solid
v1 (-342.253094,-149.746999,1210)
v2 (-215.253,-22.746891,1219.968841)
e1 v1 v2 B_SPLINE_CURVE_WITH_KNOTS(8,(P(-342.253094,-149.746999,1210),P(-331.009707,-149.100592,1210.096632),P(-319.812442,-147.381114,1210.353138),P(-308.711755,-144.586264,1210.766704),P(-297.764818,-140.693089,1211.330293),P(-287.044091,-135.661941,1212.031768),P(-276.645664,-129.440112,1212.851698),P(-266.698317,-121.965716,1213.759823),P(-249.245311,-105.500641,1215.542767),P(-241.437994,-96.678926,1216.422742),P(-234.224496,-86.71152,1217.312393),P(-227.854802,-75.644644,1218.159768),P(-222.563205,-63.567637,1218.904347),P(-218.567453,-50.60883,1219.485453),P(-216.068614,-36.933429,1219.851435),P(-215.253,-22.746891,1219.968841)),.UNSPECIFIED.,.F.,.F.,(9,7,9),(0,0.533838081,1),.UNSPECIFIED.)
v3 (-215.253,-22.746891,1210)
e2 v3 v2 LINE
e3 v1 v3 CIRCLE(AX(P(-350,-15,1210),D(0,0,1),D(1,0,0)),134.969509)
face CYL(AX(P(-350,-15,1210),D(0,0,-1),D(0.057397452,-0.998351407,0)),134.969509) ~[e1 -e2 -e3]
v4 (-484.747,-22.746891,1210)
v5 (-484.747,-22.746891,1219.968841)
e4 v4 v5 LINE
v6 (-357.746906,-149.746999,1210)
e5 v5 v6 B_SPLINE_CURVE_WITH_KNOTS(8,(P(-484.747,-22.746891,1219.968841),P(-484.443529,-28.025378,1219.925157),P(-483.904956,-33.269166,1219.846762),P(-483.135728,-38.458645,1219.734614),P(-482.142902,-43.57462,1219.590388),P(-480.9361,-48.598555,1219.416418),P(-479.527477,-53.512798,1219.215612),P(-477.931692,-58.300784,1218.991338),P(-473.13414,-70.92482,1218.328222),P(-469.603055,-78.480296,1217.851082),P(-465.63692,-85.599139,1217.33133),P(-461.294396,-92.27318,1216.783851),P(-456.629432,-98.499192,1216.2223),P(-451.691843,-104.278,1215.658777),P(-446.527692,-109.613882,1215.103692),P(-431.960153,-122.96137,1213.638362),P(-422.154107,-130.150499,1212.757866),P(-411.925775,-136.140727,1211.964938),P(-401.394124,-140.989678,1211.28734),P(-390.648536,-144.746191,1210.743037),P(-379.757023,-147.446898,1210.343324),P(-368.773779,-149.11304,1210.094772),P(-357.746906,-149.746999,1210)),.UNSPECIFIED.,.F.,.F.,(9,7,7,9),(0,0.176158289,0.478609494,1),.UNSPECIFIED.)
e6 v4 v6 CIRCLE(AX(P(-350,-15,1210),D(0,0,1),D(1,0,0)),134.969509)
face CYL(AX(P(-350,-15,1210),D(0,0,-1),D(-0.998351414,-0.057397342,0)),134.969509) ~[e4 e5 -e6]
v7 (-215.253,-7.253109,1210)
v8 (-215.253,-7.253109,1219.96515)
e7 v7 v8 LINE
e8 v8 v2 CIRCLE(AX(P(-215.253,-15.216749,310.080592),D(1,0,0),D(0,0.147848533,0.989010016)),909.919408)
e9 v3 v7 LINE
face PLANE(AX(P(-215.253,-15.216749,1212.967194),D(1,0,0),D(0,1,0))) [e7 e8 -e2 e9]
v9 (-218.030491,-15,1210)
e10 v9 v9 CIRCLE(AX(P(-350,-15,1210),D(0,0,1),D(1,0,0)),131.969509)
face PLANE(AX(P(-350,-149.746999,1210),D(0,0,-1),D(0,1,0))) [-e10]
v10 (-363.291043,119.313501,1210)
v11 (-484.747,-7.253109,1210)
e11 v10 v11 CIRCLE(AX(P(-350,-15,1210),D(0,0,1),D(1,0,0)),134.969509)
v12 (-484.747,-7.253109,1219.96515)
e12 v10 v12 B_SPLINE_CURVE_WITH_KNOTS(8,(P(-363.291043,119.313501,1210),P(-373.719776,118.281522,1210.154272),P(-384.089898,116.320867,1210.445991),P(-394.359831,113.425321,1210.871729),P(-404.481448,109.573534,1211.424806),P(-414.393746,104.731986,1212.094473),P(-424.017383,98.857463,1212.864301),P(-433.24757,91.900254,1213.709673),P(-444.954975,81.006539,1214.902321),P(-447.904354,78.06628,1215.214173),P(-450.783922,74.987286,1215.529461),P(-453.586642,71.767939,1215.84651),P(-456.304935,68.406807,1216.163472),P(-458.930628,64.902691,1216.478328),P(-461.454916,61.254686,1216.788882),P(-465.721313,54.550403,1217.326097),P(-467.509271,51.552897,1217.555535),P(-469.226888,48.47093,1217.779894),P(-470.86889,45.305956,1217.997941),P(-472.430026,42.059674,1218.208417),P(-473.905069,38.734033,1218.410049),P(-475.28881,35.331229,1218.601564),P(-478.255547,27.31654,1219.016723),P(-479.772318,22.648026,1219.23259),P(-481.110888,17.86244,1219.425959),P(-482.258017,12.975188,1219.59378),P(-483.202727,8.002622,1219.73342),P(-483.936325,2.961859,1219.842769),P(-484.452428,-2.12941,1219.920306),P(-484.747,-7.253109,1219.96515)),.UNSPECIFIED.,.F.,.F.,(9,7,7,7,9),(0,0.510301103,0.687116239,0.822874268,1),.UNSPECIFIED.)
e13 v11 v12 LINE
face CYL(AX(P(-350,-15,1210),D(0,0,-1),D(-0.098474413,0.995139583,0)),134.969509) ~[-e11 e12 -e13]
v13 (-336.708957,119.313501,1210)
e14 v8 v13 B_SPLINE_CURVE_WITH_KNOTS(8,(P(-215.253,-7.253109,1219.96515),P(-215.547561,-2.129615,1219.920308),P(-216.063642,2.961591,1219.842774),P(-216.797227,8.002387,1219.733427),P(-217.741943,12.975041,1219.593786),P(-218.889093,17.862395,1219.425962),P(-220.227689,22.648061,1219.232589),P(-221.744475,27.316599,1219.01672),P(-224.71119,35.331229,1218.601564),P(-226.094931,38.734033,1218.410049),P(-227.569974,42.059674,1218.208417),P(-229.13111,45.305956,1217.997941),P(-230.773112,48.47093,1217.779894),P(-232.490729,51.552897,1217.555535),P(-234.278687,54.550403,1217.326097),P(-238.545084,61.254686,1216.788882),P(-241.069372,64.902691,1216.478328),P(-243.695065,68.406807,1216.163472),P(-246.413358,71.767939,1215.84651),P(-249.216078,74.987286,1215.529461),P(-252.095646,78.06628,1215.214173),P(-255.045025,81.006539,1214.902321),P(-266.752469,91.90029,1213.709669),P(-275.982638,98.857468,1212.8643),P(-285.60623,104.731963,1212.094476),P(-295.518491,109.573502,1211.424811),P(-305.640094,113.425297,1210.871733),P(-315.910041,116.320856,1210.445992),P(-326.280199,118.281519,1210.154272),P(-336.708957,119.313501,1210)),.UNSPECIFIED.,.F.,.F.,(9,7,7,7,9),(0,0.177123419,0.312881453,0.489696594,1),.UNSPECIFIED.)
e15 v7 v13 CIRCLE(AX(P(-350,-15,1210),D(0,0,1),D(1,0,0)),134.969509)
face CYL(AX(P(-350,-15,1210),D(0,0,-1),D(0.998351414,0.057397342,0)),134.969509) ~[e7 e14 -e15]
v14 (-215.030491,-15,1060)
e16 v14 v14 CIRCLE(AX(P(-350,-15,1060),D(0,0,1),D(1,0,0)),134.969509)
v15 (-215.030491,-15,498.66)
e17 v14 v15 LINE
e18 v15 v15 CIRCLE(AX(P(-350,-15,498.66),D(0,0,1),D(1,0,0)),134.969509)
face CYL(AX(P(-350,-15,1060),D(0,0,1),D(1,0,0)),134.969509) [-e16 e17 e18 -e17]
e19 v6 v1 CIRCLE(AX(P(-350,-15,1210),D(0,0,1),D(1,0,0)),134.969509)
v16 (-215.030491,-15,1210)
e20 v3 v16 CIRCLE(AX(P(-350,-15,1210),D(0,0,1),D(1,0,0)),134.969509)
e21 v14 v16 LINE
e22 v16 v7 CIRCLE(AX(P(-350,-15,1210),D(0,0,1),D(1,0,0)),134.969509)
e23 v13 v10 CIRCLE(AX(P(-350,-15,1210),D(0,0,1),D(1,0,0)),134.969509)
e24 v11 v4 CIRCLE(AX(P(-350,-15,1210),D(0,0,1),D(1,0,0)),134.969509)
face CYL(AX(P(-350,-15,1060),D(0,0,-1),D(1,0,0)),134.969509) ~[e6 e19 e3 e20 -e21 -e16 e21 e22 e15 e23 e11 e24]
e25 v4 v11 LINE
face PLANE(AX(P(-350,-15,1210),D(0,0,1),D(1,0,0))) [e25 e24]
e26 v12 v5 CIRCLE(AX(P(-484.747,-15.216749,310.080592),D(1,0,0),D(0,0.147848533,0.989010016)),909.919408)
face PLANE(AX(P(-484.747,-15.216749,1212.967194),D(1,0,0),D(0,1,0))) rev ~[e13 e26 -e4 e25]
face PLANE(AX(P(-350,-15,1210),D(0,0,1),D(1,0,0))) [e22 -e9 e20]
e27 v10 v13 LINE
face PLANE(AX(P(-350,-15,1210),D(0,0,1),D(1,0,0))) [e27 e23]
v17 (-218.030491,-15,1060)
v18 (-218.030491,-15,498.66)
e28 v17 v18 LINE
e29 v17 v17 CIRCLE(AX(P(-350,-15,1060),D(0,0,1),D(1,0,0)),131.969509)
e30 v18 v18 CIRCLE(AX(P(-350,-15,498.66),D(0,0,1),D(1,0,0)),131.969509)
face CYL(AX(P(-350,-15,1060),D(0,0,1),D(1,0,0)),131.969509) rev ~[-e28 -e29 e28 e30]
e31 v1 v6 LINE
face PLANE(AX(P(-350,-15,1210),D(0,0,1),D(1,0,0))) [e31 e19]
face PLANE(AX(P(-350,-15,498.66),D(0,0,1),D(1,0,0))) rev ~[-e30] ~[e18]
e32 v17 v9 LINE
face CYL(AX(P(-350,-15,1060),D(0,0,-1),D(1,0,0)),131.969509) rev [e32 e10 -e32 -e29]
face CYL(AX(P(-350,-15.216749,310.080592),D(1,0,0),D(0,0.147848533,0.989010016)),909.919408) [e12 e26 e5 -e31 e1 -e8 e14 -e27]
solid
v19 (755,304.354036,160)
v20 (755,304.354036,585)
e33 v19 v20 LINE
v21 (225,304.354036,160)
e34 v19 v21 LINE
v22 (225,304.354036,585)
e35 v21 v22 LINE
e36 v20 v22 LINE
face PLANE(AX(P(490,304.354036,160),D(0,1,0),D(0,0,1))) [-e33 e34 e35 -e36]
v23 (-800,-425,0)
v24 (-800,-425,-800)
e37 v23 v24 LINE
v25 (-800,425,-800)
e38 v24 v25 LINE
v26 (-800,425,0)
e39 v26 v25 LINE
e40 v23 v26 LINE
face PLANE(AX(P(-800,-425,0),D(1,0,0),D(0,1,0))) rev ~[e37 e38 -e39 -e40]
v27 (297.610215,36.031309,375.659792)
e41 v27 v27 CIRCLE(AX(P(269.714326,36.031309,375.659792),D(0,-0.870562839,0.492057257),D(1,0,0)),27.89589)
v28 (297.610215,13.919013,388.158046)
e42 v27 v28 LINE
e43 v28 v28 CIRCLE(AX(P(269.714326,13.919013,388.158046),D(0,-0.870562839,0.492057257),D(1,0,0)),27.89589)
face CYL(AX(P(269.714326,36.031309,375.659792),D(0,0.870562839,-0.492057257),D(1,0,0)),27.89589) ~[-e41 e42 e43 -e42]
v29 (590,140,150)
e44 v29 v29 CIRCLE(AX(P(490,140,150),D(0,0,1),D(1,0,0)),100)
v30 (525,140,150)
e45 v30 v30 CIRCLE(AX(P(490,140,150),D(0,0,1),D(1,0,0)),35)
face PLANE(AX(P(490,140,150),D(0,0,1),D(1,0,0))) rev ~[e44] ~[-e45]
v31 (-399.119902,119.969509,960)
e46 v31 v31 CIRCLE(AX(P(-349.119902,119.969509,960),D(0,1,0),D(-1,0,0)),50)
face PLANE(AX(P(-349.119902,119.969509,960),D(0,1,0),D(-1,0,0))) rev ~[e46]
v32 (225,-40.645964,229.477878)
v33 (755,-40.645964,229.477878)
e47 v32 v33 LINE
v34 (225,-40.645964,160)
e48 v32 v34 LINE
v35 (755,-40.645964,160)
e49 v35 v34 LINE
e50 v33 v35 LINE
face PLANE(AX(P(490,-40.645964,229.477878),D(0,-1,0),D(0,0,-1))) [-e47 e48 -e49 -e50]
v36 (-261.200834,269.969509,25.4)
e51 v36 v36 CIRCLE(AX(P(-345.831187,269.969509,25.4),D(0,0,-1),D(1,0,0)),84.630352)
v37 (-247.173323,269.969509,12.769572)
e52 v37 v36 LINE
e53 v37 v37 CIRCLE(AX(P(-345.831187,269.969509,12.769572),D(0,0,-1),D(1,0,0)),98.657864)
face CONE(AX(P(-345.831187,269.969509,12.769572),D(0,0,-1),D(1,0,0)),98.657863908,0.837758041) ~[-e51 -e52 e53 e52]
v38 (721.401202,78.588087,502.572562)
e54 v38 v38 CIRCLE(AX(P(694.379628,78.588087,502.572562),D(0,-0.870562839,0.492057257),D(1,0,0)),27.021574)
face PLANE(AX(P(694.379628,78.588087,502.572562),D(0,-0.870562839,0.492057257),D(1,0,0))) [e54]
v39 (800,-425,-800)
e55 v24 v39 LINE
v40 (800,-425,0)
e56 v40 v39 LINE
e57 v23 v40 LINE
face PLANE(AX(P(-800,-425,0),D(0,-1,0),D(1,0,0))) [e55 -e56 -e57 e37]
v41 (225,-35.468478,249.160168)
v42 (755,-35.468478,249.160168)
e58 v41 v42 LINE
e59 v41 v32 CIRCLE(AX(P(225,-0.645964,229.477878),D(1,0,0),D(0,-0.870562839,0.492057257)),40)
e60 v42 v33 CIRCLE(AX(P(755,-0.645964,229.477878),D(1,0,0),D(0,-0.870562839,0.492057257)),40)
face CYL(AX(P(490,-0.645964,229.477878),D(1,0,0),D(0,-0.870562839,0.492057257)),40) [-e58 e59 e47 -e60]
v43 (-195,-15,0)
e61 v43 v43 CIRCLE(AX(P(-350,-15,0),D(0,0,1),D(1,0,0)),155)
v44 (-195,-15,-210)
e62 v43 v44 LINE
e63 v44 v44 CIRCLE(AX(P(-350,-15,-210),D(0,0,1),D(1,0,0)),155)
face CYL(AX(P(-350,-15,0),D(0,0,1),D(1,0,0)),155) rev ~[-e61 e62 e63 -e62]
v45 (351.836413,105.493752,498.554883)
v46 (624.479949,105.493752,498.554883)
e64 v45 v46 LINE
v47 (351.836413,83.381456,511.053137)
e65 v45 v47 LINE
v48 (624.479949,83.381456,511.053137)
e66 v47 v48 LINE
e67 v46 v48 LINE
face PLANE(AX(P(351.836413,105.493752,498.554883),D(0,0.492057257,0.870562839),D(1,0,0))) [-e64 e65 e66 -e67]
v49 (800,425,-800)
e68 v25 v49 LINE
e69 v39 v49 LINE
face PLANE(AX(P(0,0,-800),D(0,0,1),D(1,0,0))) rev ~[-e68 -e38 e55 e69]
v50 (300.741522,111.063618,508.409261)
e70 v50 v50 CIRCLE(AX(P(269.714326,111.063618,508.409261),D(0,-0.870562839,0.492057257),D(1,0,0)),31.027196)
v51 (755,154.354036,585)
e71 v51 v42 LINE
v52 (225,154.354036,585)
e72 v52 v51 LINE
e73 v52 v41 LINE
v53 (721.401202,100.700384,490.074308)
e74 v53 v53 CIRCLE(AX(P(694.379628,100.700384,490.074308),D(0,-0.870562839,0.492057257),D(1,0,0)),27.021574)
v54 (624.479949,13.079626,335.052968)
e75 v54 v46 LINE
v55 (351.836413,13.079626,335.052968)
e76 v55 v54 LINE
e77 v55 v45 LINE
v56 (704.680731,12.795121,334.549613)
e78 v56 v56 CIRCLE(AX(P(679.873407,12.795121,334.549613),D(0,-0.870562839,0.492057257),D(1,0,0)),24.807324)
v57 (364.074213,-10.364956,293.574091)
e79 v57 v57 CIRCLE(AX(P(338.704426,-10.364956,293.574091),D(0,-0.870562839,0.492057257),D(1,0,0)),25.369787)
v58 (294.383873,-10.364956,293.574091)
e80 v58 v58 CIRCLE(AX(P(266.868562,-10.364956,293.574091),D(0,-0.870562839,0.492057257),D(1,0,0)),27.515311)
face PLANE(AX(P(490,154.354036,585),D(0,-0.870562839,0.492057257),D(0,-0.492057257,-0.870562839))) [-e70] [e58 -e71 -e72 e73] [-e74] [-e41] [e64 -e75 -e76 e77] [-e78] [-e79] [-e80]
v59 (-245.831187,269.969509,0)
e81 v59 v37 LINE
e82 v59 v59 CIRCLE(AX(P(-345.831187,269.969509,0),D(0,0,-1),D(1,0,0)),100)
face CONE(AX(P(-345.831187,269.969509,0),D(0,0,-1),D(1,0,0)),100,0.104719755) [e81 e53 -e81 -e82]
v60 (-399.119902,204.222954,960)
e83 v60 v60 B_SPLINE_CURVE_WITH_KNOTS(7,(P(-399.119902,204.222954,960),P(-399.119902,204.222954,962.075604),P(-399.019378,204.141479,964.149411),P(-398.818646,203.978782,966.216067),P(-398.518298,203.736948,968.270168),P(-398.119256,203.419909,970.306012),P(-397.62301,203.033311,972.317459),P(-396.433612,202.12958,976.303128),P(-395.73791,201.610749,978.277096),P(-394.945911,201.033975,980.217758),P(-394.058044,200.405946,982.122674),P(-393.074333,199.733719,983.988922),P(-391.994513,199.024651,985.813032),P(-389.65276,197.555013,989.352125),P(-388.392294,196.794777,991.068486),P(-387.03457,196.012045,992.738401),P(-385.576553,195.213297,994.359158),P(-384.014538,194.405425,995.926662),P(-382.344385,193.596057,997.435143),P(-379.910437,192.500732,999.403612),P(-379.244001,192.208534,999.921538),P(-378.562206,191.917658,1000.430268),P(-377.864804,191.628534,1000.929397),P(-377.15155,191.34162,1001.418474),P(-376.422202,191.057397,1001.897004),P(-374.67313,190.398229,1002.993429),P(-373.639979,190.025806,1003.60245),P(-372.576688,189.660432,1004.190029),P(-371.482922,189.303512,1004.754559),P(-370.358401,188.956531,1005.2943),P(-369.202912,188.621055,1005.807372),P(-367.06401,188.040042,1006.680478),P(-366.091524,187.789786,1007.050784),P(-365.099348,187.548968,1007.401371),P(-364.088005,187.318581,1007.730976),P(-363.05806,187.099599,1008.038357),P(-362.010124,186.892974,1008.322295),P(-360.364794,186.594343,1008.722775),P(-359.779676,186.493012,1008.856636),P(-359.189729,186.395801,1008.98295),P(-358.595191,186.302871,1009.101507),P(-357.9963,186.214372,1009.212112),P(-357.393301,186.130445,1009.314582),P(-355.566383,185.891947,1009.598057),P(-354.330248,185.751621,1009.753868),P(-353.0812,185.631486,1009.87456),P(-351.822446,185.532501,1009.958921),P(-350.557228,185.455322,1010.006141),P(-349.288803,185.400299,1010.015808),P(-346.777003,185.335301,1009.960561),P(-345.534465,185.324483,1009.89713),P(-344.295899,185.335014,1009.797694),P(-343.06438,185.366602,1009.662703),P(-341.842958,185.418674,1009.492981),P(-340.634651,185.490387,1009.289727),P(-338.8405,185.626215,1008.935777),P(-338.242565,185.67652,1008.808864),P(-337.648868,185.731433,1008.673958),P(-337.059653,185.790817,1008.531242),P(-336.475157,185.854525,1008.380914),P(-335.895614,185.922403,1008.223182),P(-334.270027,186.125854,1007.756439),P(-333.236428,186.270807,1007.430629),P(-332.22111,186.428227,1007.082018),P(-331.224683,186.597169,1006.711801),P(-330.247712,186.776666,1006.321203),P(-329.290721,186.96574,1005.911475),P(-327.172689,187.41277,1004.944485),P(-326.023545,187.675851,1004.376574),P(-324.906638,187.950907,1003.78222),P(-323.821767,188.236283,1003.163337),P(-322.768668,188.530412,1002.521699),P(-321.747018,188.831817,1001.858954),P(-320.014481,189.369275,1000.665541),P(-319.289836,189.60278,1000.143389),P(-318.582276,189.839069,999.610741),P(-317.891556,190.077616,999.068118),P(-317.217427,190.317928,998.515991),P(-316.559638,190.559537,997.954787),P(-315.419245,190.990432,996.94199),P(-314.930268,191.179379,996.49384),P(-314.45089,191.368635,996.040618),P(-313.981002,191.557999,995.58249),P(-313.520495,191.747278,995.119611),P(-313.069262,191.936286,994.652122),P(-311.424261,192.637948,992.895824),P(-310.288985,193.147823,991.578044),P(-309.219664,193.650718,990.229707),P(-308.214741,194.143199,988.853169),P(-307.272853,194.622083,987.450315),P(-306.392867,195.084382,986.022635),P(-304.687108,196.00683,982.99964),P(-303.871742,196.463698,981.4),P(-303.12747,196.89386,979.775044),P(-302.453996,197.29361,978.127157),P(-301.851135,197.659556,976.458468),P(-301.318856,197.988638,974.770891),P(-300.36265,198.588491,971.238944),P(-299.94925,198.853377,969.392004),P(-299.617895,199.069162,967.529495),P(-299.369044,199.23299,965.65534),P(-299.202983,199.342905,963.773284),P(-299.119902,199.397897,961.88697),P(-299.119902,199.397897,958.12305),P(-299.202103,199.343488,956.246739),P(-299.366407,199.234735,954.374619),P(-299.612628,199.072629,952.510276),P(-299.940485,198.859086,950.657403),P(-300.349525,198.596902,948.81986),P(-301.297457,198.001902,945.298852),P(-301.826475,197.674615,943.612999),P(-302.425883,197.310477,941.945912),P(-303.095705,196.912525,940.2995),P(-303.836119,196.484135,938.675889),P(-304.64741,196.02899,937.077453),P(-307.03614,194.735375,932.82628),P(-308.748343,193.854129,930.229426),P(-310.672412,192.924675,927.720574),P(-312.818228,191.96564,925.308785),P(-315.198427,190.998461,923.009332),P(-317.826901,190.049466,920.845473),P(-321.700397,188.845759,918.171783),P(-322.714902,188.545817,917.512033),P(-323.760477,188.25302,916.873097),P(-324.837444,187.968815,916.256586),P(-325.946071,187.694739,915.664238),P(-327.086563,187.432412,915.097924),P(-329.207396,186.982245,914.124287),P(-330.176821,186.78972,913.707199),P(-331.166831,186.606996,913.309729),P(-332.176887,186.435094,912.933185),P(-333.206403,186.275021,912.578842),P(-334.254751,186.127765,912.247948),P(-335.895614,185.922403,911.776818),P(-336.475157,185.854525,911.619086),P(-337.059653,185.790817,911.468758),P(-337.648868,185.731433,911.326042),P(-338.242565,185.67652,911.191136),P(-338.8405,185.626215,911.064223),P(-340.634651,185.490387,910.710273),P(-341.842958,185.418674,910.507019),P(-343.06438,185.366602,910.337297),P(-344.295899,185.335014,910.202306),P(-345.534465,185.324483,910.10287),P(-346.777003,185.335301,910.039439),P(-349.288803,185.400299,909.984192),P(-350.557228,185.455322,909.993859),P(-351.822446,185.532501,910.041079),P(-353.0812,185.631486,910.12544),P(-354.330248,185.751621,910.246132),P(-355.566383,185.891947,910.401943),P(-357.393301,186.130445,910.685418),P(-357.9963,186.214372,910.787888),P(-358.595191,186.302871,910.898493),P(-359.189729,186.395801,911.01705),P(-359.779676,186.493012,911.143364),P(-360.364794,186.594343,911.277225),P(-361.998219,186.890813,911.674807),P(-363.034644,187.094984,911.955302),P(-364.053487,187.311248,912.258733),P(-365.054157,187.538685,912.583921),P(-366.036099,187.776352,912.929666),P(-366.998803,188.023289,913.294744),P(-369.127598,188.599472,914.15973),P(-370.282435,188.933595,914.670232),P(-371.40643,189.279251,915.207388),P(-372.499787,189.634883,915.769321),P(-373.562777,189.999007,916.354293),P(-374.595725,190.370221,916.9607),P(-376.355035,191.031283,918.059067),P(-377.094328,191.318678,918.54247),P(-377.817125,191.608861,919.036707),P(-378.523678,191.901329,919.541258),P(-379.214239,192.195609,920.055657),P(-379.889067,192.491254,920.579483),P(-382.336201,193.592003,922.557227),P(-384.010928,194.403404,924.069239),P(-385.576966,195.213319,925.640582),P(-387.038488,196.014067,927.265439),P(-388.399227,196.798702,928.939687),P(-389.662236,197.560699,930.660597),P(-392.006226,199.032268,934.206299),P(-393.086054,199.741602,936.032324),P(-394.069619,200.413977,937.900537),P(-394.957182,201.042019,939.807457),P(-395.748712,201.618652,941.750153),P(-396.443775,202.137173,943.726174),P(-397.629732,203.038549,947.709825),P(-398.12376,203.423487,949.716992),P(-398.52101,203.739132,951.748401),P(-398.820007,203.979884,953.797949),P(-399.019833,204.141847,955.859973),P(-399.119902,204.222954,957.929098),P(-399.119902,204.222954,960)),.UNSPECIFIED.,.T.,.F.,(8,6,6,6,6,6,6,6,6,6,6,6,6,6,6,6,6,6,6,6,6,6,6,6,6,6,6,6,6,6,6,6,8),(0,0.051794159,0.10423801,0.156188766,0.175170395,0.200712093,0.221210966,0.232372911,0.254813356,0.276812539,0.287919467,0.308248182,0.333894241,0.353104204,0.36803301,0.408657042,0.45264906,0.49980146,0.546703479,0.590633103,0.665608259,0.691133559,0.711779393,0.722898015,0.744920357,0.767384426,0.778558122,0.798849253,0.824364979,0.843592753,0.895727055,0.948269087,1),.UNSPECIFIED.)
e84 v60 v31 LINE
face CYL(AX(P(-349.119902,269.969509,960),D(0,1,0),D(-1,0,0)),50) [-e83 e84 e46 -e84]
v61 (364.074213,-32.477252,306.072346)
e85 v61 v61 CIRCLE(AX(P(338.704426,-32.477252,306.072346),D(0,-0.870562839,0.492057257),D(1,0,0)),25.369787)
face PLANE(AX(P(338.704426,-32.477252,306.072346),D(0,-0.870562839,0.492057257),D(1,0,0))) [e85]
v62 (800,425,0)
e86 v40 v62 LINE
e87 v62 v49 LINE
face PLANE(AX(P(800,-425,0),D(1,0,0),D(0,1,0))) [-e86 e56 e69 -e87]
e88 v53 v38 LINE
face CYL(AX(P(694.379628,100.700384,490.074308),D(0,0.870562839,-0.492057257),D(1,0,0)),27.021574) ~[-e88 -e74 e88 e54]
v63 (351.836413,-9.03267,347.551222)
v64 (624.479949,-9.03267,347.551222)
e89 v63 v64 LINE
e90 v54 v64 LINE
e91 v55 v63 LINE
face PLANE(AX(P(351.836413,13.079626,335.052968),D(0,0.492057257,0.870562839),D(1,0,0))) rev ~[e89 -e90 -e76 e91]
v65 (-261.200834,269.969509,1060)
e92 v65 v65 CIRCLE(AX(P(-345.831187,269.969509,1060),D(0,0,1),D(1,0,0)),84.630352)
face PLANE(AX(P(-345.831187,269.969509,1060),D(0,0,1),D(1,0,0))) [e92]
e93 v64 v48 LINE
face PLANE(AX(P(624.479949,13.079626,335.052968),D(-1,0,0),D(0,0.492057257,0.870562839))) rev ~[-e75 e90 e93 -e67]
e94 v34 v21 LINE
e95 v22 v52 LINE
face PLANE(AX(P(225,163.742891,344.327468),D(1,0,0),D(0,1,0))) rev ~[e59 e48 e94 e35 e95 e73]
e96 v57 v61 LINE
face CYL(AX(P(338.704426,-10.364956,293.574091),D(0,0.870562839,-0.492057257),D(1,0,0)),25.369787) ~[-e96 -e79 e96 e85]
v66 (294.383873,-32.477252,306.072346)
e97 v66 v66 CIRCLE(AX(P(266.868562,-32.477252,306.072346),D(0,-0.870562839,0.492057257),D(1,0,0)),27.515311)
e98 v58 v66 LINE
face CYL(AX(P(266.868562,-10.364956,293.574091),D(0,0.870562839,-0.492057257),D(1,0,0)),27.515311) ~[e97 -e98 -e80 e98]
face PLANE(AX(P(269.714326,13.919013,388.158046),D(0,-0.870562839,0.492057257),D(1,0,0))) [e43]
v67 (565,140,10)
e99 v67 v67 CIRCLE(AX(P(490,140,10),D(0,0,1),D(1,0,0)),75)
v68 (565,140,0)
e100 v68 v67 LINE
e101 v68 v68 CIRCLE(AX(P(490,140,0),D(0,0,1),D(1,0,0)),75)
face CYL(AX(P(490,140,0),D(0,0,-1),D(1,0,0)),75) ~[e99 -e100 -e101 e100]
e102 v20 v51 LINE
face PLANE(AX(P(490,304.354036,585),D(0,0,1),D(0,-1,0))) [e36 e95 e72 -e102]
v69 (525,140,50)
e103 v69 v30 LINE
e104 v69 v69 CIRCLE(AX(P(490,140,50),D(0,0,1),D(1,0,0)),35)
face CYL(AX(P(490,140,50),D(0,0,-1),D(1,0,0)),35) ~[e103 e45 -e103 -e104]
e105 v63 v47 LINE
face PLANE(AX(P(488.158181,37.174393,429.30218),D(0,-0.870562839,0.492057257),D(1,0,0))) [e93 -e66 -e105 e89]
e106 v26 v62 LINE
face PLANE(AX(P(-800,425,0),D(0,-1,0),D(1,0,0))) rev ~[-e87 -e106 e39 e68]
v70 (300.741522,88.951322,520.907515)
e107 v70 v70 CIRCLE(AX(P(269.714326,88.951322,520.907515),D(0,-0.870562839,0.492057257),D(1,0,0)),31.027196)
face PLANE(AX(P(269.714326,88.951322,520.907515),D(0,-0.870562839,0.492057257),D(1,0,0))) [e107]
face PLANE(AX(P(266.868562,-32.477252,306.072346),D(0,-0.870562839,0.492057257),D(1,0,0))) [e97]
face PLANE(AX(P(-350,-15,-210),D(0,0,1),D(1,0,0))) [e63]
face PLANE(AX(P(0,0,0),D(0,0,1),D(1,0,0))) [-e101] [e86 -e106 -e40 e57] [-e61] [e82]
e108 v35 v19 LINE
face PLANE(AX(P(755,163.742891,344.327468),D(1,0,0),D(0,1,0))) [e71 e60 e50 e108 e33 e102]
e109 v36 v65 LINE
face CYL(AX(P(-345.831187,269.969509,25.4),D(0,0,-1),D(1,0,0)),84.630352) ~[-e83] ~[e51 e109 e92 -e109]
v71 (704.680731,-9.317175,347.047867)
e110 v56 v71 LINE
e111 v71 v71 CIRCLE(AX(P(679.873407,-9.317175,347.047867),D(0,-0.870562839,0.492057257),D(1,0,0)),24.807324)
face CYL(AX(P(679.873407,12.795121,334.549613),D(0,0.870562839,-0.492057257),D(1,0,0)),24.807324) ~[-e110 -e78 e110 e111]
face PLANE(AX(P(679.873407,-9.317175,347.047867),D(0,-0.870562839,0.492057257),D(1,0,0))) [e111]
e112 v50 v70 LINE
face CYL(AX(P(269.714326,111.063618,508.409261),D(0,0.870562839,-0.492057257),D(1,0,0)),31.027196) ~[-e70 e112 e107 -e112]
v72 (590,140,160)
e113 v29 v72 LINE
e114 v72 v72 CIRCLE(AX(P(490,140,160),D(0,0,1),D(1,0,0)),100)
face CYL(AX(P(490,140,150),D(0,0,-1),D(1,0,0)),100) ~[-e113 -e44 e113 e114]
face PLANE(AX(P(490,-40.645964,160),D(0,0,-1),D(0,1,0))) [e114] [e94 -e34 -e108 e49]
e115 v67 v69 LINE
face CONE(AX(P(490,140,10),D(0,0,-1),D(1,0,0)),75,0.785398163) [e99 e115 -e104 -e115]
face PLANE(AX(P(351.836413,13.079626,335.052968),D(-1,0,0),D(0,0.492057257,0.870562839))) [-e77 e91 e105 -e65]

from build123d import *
from build123d import SkipClean  # not in build123d's __all__

# Parameters (mm, degrees)
F0_W      = 1600
F0_H      = 850
F1_DEPTH  = 800
F2_R      = 155
F3_DEPTH  = 210
F4_R      = 100
F5_DEPTH  = 25.4
F5_TAPER  = 6
F7_R      = 84.6303524243
F8_DEPTH  = 1034.6
F9_R      = 75
F10_DEPTH = 50
F11_SIZE  = 40
F12_R     = 35
F13_DEPTH = 100
F14_R     = 100
F15_DEPTH = 10
F18_DEPTH = 265
F20_R     = 50
F21_DEPTH = 150
F22_R     = 134.9695088885
F22_R_2   = 131.9695088885
F23_DEPTH = 561.34
F24_R     = 134.9695088885
F24_R_2   = 131.9695088885
F25_DEPTH = 150
F28_DEPTH = 134.747
F30_DEPTH = 25.4
F32_DEPTH = 25.4
F34_DEPTH = 25.4
F36_DEPTH = 25.4
F37_R     = 31.0271964064
F37_R_2   = 27.8958895213
F37_R_3   = 27.5153110401
F37_R_4   = 25.3697871684
F37_R_5   = 27.0215738096
F37_R_6   = 24.8073241301
F37_W     = 272.6435363293
F37_H     = 187.8117322922
F38_DEPTH = 25.4


# Not quite as in the source:
# - a fillet or chamfer that OpenCascade refuses, or shapes differently, is made with other operations: its cross-section is extruded or revolved along the edge and cut away or added


with BuildPart() as f1:
    # F0 (on Top) → F1 (new body)
    with BuildSketch(Plane.XY):
        Rectangle(F0_W, F0_H)
    extrude(amount=-F1_DEPTH)

    # F2 (on face) → F3 (cut)
    with BuildSketch(Plane.XY):
        with Locations((-350, -15)):
            Circle(F2_R)
    extrude(amount=-F3_DEPTH, mode=Mode.SUBTRACT)

    # F4 (on face) → F5 (join)
    with BuildSketch(Plane.XY):
        with Locations((-345.8311867569, 269.9695088885)):
            Circle(F4_R)
    extrude(amount=F5_DEPTH, taper=F5_TAPER)

    # F6: chamfer of 12.7 on 1 edges, made by hand

    # F6_s1 → F6_t2 (revolve, cut)
    with BuildSketch(Plane.XZ.offset(-269.9695088885)):
        Polygon((-247.1733228492, 12.7695719288), (-261.2008343327, 25.4), (-248.5008343327, 25.4), align=None)
    revolve(axis=Axis((-345.8311867569, 269.9695088885, 25.4), (0, 0, -1)), mode=Mode.SUBTRACT)

    # F7 (on face) → F8 (join)
    with BuildSketch(Plane.XY.offset(25.4)):
        with Locations((-345.8311867569, 269.9695088885)):
            Circle(F7_R)
    extrude(amount=F8_DEPTH)

    # F9 (on face) → F10 (join)
    with BuildSketch(Plane.XY):
        with Locations((490, 140)):
            Circle(F9_R)
    extrude(amount=F10_DEPTH)

    # F11
    f11_edges = [f1.edges().sort_by_distance(p)[0] for p in [
        (415, 140, 50),
    ]]
    chamfer(f11_edges, length=F11_SIZE)

    # F12 (on face) → F13 (join)
    with BuildSketch(Plane.XY.offset(50)):
        with Locations((490, 140)):
            Circle(F12_R)
    extrude(amount=F13_DEPTH)

    # F14 (on face) → F15 (join)
    with BuildSketch(Plane.XY.offset(150)):
        with Locations((490, 140)):
            Circle(F14_R)
    extrude(amount=F15_DEPTH)

    # F17 (on face) → F18 (join, symmetric)
    with BuildSketch(Plane.YZ.offset(490)):
        with BuildLine():
            Line((304.3540355563, 585), (154.3540355563, 585))
            Line((154.3540355563, 585), (-35.4684779925, 249.1601683367))
            ThreePointArc((-35.4684779925, 249.1601683367), (-39.3299439569, 239.6538167994), (-40.6459644437, 229.47787807))
            Line((-40.6459644437, 229.47787807), (-40.6459644437, 160))
            Line((-40.6459644437, 160), (304.3540355563, 160))
            Line((304.3540355563, 160), (304.3540355563, 585))
        make_face()
    extrude(amount=F18_DEPTH, both=True)

    # F20 (on face) → F21 (join)
    with BuildSketch(Plane(origin=(0, 269.9695088885, 0), x_dir=(-1, 0, 0), z_dir=(0, 1, 0))):
        with Locations((349.1199016571, 960)):
            Circle(F20_R)
    extrude(amount=-F21_DEPTH)

    # F37 (on face) → F38 (join)
    with BuildSketch(Plane(origin=(0, -133.6127724795, 75.5202627058), x_dir=(1, 0, 0), z_dir=(0, -0.8705628387, 0.4920572567))):
        with Locations((269.7143256664, 497.251868248)):
            Circle(F37_R)
        with Locations((269.7143256664, 344.7649217223)):
            Circle(F37_R_2)
        with Locations((266.8685615063, 250.4745423794)):
            Circle(F37_R_3)
        with Locations((338.7044257195, 250.4745423794)):
            Circle(F37_R_4)
        with Locations((694.3796277046, 476.1908352375)):
            Circle(F37_R_5)
        with Locations((679.8734068871, 297.5423932076)):
            Circle(F37_R_6)
        with Locations((488.1581813097, 392.0264542103)):
            Rectangle(F37_W, F37_H)
    extrude(amount=F38_DEPTH)


with BuildPart() as f23:
    # F22 (on face) → F23 (new body)
    with BuildSketch(Plane.XY.offset(1060)):
        with Locations((-350, -15)):
            Circle(F22_R)
        with Locations((-350, -15)):
            Circle(F22_R_2, mode=Mode.SUBTRACT)
    extrude(amount=-F23_DEPTH)

    # F24 (on face) → F25 (join)
    with BuildSketch(Plane.XY.offset(1060)):
        with Locations((-350, -15)):
            Circle(F24_R)
        with Locations((-350, -15)):
            Circle(F24_R_2, mode=Mode.SUBTRACT)
    extrude(amount=F25_DEPTH)

    # F27 (on face) → F28 (join, symmetric)
    with BuildSketch(Plane.YZ.offset(-350)):
        with BuildLine():
            Line((-149.7469991446, 1210), (119.3135008216, 1210))
            ThreePointArc((119.3135008216, 1210), (-15.2167491615, 1220), (-149.7469991446, 1210))
        make_face()
    extrude(amount=F28_DEPTH, both=True)

    # F29 (on face) → F30 (cut)
    with BuildSketch(Plane(origin=(0, 0, 1210), x_dir=(1, 0, 0), z_dir=(0, 0, -1))):
        with BuildLine():
            Line((-484.747, 7.2531089721), (-484.747, -119.3135008216))
            Line((-484.747, -119.3135008216), (-363.2910430985, -119.3135008216))
            ThreePointArc((-363.2910430985, -119.3135008216), (-447.3837369881, -78.451463872), (-484.747, 7.2531089721))
        make_face()
    extrude(amount=-F30_DEPTH, mode=Mode.SUBTRACT)

    # F31 (on face) → F32 (cut)
    with BuildSketch(Plane(origin=(0, 0, 1210), x_dir=(1, 0, 0), z_dir=(0, 0, -1))):
        with BuildLine():
            Line((-357.7469059073, 149.7469991446), (-484.747, 149.7469991446))
            Line((-484.747, 149.7469991446), (-484.747, 22.7468910279))
            ThreePointArc((-484.747, 22.7468910279), (-445.4378602578, 110.4378497191), (-357.7469059073, 149.7469991446))
        make_face()
    extrude(amount=-F32_DEPTH, mode=Mode.SUBTRACT)

    # F33 (on face) → F34 (cut)
    with BuildSketch(Plane(origin=(0, 0, 1210), x_dir=(1, 0, 0), z_dir=(0, 0, -1))):
        with BuildLine():
            Line((-336.7089569015, -119.3135008216), (-215.253, -119.3135008216))
            Line((-215.253, -119.3135008216), (-215.253, 7.2531089721))
            ThreePointArc((-215.253, 7.2531089721), (-252.6162630119, -78.451463872), (-336.7089569015, -119.3135008216))
        make_face()
    extrude(amount=-F34_DEPTH, mode=Mode.SUBTRACT)

    # F35 (on face) → F36 (cut)
    with BuildSketch(Plane(origin=(0, 0, 1210), x_dir=(1, 0, 0), z_dir=(0, 0, -1))):
        with BuildLine():
            Line((-215.253, 22.7468910279), (-215.253, 149.7469991446))
            Line((-215.253, 149.7469991446), (-342.2530940927, 149.7469991446))
            ThreePointArc((-342.2530940927, 149.7469991446), (-254.5621397422, 110.4378497191), (-215.253, 22.7468910279))
        make_face()
    with SkipClean():  # cleaning this boolean's faces spoils the solid; the shape is the same uncleaned
        extrude(amount=-F36_DEPTH, mode=Mode.SUBTRACT)


solid = Compound([f1.part, f23.part])
